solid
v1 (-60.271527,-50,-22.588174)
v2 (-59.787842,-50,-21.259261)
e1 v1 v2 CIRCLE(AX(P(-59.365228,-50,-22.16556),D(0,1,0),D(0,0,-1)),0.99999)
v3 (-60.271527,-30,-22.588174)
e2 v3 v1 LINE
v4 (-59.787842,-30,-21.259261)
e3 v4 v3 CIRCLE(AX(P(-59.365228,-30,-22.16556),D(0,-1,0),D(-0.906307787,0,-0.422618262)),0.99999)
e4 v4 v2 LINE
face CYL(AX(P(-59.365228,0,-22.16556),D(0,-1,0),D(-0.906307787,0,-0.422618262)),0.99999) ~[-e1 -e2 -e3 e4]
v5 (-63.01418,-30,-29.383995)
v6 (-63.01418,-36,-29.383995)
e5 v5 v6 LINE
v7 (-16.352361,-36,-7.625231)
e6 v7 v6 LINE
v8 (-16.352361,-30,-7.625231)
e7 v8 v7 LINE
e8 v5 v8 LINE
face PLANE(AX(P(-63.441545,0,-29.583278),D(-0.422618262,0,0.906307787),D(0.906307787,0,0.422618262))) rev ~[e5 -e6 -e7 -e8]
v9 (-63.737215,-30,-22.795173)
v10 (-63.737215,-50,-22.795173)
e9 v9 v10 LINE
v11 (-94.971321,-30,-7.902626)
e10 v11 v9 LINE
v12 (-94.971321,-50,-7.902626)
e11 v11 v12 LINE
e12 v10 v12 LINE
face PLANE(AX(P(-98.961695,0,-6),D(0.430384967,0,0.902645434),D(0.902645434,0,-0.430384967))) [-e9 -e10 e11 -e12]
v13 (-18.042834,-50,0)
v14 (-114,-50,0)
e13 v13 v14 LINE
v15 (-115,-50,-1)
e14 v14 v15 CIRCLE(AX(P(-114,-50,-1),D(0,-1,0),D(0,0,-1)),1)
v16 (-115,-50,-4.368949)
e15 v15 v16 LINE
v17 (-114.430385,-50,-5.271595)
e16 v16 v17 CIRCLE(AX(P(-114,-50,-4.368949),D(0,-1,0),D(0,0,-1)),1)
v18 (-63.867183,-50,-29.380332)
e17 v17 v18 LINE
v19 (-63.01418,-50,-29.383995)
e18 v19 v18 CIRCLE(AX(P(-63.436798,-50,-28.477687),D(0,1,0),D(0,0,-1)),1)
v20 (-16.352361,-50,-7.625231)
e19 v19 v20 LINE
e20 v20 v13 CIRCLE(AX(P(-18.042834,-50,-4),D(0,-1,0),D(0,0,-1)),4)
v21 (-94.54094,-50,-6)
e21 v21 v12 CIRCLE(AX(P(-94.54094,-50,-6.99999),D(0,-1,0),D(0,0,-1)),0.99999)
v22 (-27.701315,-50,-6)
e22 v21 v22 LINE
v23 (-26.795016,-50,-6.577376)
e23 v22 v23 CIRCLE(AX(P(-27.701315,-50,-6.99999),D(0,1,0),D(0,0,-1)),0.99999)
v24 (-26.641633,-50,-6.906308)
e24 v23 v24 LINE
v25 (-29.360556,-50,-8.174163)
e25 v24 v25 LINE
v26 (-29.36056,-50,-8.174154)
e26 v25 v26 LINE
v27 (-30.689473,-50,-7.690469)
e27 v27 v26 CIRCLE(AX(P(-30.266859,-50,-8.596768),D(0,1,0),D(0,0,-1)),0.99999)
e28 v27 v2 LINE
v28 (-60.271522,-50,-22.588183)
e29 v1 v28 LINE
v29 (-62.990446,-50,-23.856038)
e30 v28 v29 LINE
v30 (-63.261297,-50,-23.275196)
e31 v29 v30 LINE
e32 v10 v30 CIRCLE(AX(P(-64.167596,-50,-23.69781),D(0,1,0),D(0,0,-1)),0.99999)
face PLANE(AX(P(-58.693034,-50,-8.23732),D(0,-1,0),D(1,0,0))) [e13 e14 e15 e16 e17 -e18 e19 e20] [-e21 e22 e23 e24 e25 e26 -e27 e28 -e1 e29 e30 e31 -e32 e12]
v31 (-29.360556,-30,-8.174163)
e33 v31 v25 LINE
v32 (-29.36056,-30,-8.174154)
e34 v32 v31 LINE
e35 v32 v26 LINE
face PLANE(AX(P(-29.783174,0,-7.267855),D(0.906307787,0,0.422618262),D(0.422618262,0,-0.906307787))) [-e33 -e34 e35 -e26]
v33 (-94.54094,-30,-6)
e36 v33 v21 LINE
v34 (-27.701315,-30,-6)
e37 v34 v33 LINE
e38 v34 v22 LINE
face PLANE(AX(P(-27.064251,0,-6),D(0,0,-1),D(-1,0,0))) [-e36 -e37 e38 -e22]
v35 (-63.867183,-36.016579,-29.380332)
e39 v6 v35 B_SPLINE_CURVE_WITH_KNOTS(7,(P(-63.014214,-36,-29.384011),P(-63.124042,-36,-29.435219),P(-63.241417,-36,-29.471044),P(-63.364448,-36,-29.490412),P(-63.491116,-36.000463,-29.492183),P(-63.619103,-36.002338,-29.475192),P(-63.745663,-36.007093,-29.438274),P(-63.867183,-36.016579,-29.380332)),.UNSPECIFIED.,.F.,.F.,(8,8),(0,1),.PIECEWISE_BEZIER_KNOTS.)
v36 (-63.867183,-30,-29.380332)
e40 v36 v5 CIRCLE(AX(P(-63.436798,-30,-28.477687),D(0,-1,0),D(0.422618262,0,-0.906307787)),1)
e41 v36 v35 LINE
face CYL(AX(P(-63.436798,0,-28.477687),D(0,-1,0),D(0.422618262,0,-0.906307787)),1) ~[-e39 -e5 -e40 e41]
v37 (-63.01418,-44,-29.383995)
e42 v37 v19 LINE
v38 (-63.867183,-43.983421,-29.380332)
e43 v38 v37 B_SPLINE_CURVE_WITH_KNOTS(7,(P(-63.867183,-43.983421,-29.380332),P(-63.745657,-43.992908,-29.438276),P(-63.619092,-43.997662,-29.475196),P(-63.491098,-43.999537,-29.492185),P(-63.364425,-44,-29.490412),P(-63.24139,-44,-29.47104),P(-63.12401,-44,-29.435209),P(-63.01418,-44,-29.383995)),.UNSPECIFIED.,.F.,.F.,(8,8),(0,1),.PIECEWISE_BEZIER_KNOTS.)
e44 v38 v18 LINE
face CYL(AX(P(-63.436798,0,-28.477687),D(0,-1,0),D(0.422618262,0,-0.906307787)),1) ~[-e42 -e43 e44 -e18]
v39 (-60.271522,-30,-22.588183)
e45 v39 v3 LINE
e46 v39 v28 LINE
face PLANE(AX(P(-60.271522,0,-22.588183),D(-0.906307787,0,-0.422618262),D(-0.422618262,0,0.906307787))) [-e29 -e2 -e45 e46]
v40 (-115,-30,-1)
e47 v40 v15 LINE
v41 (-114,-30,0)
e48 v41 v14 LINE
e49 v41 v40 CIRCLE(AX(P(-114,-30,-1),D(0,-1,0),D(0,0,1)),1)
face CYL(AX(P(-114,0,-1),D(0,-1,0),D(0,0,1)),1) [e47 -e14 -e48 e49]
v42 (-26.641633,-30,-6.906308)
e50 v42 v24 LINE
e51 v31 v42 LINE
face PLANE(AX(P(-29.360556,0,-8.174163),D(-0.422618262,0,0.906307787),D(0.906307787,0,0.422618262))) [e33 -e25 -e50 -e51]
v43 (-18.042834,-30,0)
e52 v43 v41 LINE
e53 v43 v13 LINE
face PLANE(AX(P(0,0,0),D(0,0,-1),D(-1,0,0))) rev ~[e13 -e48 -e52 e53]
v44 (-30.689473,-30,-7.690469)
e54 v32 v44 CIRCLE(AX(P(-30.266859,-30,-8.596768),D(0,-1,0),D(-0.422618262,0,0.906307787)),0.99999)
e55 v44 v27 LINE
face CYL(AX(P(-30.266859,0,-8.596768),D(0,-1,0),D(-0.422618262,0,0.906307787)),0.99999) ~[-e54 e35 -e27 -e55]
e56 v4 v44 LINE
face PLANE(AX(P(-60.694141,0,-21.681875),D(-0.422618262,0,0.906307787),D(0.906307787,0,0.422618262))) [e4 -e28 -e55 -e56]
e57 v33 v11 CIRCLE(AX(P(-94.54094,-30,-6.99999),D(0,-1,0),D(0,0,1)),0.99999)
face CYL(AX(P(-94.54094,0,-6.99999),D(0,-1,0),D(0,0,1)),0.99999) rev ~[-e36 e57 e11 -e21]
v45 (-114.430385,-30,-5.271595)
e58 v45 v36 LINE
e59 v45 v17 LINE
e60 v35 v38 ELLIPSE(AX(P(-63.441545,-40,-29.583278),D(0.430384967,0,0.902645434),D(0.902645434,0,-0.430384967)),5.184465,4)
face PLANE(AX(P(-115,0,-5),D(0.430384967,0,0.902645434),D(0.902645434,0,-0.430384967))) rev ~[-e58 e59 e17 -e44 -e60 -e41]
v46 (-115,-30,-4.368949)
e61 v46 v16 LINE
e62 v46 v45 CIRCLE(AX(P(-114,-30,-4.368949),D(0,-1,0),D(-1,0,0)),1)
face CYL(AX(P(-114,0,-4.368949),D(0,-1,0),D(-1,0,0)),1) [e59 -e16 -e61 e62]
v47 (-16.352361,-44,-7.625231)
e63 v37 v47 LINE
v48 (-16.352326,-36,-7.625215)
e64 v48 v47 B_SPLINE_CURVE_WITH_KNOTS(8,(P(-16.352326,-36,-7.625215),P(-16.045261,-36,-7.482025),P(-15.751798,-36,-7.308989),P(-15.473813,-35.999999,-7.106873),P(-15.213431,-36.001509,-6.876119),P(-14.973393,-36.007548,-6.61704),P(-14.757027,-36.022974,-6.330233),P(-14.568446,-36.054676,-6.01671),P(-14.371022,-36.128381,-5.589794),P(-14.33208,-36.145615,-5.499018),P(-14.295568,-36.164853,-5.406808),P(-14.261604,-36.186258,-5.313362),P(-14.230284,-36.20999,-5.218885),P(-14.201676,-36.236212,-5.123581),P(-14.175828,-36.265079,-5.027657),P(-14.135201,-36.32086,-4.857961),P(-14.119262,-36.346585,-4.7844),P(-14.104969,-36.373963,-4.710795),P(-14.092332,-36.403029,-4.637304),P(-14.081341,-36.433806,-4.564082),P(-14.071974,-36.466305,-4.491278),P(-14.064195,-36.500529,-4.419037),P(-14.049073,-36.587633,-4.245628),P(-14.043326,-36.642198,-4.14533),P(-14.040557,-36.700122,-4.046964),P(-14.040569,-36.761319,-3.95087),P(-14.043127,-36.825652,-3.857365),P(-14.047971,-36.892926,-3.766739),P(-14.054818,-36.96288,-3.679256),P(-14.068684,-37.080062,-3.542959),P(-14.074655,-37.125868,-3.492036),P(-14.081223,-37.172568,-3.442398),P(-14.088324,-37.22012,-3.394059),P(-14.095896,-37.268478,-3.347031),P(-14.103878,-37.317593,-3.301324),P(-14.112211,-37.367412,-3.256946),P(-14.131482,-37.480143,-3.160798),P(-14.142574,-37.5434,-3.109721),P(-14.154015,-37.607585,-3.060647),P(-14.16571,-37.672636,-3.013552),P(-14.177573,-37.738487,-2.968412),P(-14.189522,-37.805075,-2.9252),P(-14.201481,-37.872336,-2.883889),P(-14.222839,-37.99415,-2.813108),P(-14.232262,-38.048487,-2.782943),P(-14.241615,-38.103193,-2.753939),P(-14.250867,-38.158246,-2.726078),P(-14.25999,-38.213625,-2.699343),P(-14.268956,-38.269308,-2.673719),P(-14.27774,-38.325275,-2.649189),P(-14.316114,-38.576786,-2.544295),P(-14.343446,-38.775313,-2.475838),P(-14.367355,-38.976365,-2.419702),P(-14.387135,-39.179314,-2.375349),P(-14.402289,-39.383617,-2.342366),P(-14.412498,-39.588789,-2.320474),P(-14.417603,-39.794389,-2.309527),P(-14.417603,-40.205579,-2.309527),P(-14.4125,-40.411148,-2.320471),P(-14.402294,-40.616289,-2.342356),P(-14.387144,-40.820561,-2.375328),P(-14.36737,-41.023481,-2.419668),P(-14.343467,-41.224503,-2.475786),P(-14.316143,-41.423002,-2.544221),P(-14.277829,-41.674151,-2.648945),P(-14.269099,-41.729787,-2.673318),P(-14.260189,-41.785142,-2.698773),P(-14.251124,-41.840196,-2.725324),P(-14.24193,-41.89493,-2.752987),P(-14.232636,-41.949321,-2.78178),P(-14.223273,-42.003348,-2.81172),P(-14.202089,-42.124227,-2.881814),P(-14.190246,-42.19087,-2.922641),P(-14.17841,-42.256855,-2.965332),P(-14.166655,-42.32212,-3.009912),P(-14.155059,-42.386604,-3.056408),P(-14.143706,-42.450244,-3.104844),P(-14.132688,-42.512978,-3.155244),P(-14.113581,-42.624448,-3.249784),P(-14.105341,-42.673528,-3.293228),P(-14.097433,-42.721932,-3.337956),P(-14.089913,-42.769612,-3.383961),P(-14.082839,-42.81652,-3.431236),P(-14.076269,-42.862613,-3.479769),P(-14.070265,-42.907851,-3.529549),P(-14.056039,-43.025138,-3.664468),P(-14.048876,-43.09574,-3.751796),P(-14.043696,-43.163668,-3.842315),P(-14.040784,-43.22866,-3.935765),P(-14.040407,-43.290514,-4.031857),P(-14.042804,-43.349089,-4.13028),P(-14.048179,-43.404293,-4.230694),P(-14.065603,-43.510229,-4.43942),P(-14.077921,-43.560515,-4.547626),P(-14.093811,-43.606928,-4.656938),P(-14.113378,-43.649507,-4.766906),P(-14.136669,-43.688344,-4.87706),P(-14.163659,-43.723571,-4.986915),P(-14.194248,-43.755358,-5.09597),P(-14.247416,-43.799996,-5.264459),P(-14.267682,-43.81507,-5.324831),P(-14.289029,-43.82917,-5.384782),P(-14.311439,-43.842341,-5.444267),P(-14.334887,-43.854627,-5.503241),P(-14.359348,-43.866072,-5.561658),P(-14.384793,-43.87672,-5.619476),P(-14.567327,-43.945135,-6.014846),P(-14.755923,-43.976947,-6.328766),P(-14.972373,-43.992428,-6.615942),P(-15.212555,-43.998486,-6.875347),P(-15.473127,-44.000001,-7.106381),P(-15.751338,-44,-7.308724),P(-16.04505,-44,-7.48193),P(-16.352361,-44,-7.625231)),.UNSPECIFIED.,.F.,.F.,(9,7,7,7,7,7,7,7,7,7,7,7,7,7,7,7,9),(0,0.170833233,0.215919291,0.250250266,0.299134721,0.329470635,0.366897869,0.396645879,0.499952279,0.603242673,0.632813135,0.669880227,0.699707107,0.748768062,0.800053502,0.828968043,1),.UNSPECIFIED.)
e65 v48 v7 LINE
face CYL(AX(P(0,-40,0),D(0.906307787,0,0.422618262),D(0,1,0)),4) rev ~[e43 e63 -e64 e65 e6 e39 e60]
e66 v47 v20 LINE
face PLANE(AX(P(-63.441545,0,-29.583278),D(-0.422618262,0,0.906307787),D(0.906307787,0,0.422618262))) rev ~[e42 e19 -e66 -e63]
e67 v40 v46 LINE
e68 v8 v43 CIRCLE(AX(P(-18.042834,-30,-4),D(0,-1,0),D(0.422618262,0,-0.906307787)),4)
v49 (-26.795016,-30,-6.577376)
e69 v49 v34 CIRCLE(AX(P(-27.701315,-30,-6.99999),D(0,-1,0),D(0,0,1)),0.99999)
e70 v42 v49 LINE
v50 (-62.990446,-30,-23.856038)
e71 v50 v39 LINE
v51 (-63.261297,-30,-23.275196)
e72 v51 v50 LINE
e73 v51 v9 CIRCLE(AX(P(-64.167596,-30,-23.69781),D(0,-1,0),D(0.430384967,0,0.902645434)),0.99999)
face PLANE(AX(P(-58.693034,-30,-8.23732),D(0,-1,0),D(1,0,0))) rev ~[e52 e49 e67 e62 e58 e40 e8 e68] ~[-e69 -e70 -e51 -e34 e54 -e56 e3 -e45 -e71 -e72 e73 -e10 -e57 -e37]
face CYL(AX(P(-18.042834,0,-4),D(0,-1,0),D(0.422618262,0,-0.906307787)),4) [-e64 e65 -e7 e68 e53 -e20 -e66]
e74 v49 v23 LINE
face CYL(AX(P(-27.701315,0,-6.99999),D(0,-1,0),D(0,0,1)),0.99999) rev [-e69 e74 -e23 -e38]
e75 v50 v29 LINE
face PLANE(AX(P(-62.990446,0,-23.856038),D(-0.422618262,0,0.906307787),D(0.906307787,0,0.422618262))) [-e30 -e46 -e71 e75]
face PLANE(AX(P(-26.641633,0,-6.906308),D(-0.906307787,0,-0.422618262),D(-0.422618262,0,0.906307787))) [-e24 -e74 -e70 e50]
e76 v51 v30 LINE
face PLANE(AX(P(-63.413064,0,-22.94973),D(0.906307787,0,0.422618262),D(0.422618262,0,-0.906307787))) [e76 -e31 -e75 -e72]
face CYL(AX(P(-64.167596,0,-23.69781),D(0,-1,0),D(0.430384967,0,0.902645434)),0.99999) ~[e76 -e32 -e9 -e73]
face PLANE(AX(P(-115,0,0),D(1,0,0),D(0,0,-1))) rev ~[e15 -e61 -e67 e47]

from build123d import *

# Parameters (mm, degrees)
F1_DEPTH  = 50
F3_R      = 1
F4_R      = 4
F5_R      = 4
F6_DEPTH  = 116.6842043143
F8_DEPTH  = 50.0010001
F9_R      = 0.99999
F10_DEPTH = 30


# Not quite as in the source:
# - a fillet or chamfer is up to 0.001 mm smaller than in the source, because OpenCascade refuses the exact size


with BuildPart() as f1:
    # F0 (on Front) → F1 (new body)
    with BuildSketch(Plane.XZ):
        Polygon((-63.4415450926, -29.5832783218), (0, 0), (-115, 0), (-115, -5), align=None)
    extrude(amount=F1_DEPTH)

    # F3
    f3_edges = [f1.edges().sort_by_distance(p)[0] for p in [
        (-63.441545, -25, -29.583278),
        (-115, -25, -5),
        (-115, -25, 0),
    ]]
    fillet(f3_edges, radius=F3_R)

    # F4
    f4_edges = [f1.edges().sort_by_distance(p)[0] for p in [
        (0, -25, 0),
    ]]
    fillet(f4_edges, radius=F4_R)

    # F5 (on face) → F6 (cut, through all)
    with BuildSketch(Plane(origin=(0, 0, 0), x_dir=(0, 1, 0), z_dir=(0.906307787, 0, 0.4226182617))):
        with Locations((-40, 0)):
            Circle(F5_R)
    extrude(amount=-F6_DEPTH, mode=Mode.SUBTRACT)

    # F7 (on Front) → F8 (cut, through all)
    with BuildSketch(Plane.XZ):
        Polygon((-27.064251022, -6), (-98.9616948614, -6), (-63.4130640807, -22.9497298941), (-62.990445819, -23.8560376812), (-60.2715224579, -22.588182896), (-60.6941407196, -21.6818751089), (-29.7831743831, -7.2678547852), (-29.3605561213, -8.1741625723), (-26.6416327602, -6.906307787), align=None)
    extrude(amount=F8_DEPTH, mode=Mode.SUBTRACT)

    # F9 (radius 1 in the source; OpenCascade refuses exactly that, so slightly less here)
    f9_edges = [f1.edges().sort_by_distance(p)[0] for p in [
        (-98.961695, -25, -6),
        (-60.694141, -25, -21.681875),
        (-29.783174, -25, -7.267855),
        (-27.064251, -25, -6),
        (-63.413064, -25, -22.94973),
    ]]
    fillet(f9_edges, radius=F9_R)

    # F0 (on Front) → F10 (cut)
    with BuildSketch(Plane.XZ):
        Polygon((-63.4415450926, -29.5832783218), (0, 0), (-115, 0), (-115, -5), align=None)
    extrude(amount=F10_DEPTH, mode=Mode.SUBTRACT)


solid = f1.part
